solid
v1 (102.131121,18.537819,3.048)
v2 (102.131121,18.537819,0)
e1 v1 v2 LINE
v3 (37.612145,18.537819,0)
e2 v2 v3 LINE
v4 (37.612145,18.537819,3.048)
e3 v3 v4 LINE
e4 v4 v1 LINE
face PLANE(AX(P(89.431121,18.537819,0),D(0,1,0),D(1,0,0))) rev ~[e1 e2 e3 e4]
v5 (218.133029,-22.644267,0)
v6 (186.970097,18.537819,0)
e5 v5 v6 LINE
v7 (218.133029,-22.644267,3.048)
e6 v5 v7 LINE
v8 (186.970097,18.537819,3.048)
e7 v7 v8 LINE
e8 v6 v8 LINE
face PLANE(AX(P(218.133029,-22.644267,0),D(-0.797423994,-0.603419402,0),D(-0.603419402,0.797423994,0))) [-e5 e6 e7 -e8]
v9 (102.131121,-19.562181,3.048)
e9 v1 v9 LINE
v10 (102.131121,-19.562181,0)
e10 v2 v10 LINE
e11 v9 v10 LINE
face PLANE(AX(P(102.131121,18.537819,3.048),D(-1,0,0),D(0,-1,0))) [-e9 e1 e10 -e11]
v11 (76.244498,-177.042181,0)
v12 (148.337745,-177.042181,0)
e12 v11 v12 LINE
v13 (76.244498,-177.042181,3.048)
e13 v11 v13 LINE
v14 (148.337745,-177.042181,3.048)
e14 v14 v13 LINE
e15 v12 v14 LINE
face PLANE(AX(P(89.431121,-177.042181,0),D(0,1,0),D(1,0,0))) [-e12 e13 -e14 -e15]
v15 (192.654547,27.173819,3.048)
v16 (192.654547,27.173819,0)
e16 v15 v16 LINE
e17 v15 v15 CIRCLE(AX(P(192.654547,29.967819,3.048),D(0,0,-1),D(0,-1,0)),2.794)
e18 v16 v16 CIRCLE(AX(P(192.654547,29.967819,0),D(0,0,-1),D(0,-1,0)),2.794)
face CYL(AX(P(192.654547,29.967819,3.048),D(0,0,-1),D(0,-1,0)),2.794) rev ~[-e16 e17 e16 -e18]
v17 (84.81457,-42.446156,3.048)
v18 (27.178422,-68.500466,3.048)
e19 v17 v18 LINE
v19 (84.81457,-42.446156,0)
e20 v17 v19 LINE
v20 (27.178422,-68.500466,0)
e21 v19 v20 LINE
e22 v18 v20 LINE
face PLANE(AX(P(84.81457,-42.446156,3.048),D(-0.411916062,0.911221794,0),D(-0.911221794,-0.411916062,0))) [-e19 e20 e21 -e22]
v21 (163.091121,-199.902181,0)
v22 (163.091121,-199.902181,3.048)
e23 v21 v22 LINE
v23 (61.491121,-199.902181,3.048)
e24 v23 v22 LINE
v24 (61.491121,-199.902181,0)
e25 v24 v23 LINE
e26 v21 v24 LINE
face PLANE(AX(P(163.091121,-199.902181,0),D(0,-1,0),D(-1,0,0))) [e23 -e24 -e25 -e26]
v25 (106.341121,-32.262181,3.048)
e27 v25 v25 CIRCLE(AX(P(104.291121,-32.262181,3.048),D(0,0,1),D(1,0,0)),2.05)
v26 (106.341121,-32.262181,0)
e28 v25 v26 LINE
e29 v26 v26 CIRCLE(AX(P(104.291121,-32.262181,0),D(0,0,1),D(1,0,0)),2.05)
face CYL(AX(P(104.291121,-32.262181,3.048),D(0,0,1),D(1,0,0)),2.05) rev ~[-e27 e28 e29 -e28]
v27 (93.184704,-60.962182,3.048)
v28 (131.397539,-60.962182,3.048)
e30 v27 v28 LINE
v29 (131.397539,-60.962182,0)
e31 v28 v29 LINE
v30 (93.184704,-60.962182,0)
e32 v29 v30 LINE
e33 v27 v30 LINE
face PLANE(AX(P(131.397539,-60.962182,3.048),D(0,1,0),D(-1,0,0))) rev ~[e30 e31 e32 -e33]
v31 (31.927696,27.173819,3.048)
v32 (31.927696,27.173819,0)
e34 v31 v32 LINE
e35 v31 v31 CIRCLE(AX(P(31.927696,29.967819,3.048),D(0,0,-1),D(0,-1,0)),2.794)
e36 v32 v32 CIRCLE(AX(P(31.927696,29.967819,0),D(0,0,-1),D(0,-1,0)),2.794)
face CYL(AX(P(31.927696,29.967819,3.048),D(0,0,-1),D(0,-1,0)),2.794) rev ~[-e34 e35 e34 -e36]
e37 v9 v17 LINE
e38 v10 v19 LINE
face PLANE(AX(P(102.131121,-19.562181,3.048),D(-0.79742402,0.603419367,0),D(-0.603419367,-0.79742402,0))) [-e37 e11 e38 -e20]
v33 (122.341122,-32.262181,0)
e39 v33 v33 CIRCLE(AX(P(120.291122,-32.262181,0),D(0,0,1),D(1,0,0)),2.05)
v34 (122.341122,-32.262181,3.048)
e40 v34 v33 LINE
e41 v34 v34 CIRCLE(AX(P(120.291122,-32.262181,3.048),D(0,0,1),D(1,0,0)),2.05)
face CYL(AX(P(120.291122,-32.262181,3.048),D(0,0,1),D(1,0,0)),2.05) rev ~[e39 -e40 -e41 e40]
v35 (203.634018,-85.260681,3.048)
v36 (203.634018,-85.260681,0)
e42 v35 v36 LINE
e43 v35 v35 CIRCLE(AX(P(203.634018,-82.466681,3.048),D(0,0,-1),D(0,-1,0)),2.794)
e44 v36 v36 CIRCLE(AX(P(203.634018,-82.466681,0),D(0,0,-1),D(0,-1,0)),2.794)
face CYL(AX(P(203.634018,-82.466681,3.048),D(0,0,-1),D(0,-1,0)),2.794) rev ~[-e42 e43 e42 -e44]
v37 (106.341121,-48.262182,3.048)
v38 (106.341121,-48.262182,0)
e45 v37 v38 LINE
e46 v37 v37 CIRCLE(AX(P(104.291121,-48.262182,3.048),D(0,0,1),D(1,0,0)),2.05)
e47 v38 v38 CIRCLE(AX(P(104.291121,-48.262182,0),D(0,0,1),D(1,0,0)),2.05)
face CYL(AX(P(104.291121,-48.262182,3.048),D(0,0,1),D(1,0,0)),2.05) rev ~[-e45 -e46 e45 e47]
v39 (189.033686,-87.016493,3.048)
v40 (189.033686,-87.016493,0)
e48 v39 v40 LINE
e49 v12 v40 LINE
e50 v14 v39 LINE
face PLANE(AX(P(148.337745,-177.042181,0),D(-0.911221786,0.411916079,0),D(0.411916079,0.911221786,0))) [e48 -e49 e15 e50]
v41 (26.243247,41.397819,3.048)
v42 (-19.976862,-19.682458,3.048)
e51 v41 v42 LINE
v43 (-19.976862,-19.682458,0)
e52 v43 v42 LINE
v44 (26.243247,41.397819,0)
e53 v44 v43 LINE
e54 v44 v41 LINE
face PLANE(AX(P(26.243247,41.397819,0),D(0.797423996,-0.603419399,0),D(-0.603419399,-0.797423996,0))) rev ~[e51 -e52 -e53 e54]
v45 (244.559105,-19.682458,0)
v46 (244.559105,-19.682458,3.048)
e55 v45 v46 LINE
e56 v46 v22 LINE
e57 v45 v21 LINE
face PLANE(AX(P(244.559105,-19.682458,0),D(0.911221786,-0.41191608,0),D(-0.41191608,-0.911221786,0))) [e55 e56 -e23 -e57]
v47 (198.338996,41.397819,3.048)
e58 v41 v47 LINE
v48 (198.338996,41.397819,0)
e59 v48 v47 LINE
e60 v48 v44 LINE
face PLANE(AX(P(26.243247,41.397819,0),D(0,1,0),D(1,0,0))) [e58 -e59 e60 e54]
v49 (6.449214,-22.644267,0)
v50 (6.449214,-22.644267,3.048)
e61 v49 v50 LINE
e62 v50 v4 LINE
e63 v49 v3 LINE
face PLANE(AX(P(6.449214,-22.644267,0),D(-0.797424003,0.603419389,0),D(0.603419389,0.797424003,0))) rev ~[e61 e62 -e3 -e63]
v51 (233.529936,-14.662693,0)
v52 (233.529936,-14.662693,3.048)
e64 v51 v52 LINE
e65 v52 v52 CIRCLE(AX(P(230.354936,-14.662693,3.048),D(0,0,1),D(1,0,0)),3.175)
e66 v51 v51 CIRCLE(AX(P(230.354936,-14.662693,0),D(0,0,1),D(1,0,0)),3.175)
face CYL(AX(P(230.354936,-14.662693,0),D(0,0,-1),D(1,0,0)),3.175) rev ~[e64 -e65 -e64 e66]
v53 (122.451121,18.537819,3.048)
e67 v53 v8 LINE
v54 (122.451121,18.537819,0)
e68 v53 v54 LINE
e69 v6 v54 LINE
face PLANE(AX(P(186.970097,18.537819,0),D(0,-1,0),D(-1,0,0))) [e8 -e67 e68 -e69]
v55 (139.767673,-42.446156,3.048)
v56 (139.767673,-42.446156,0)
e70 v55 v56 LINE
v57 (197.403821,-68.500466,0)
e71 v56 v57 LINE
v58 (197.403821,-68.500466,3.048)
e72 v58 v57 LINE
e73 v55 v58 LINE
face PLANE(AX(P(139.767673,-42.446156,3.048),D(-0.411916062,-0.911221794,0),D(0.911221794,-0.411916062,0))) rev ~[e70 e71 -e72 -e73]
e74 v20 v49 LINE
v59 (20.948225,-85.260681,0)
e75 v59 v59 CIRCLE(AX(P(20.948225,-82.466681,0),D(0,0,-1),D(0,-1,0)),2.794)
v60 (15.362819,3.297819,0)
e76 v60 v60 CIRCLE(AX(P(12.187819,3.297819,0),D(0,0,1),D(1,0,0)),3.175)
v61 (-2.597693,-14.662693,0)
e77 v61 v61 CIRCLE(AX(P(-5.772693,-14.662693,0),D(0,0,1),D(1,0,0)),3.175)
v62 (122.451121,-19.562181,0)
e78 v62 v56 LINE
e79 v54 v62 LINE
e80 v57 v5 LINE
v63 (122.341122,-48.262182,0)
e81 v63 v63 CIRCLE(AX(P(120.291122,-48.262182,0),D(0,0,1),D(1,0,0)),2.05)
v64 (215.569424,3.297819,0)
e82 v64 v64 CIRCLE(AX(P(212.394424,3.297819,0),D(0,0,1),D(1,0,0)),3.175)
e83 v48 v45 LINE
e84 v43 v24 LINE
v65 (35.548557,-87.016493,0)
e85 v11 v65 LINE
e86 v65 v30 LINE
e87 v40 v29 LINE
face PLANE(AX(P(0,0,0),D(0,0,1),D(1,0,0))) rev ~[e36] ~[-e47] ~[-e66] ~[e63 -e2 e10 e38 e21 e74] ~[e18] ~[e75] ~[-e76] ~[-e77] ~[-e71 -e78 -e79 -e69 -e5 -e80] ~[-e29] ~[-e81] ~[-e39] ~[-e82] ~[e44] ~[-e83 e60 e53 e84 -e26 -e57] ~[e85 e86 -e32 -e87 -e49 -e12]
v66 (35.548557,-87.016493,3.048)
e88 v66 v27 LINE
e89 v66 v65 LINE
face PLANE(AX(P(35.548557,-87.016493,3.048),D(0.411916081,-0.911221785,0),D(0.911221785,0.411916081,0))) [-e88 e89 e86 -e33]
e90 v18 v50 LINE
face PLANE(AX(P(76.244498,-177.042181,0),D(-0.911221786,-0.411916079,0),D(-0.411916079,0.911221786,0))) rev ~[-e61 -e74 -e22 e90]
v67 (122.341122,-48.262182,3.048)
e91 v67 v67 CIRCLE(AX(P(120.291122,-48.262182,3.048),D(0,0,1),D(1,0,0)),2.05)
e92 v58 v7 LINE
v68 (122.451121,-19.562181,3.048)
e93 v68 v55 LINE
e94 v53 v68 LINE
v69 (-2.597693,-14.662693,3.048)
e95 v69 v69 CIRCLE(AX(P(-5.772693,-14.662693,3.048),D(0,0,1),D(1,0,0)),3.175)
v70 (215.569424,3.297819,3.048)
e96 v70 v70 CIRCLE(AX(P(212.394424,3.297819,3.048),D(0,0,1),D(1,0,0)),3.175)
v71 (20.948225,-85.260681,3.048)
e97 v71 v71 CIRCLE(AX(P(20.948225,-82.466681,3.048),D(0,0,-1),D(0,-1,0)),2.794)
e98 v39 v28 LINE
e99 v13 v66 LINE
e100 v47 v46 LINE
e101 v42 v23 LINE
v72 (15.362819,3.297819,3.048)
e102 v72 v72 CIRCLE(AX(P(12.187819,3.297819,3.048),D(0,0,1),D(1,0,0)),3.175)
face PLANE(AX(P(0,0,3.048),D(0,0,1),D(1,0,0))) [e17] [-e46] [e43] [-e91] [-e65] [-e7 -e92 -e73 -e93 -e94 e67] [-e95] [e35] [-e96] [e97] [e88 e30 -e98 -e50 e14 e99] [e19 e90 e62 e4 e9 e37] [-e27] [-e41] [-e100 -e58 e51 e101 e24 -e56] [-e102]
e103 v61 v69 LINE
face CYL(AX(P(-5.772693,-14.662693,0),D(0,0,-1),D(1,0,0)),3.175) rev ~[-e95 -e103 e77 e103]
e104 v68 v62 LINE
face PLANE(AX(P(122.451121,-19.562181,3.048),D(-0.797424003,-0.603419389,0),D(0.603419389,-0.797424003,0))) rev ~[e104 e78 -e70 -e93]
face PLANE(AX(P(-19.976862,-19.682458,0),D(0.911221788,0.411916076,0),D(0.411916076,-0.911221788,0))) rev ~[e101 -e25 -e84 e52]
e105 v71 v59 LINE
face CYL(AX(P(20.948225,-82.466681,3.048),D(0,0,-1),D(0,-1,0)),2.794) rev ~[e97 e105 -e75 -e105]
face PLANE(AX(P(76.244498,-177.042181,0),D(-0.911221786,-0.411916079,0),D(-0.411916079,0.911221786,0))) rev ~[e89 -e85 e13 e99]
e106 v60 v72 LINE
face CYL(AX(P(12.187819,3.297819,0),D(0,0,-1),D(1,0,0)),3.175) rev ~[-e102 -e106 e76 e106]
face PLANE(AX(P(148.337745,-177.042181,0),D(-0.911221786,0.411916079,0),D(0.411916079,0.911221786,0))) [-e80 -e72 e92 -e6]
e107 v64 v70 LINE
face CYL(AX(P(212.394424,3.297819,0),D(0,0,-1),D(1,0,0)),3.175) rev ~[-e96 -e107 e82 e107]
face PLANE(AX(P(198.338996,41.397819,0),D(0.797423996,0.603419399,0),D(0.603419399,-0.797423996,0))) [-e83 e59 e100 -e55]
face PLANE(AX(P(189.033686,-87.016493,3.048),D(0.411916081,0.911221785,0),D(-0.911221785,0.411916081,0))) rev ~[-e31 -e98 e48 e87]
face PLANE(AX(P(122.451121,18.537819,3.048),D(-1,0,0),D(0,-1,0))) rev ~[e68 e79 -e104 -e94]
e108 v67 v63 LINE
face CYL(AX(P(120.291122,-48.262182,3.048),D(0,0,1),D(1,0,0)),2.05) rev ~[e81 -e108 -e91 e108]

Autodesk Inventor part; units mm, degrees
ref_plane "YZ Plane" through (0, 0, 0) normal (1, 0, 0) x (0, 1, 0)
ref_plane "XZ Plane" through (0, 0, 0) normal (0, 1, 0) x (-1, 0, 0)
ref_plane "XY Plane" through (0, 0, 0) normal (0, 0, 1) x (1, 0, 0)
sketch "Base" plane through (0, 0, 0) normal (0, 0, 1) x (1, 0, 0)
  circle A0 centre (12.187819, 3.297819) radius 3.175
  circle A1 centre (-5.772693, -14.662693) radius 3.175
  circle A2 centre (212.394424, 3.297819) radius 3.175
  circle A3 centre (230.354936, -14.662693) radius 3.175
  arc A4 (-21.168075, -17.047312) -> (9.622688, 23.64295) centre (-130.364106, 97.577494) ccw construction
  arc A5 (214.959555, 23.64295) -> (245.750318, -17.047312) centre (354.946349, 97.577494) ccw construction
  line L0 (26.243247, 41.397819) -> (-19.976862, -19.682458)
  line L1 (12.187819, 3.297819) -> (212.394424, 3.297819) construction
  line L2 (112.291121, 41.397819) -> (112.291121, -199.902181) construction
  line L3 (26.243247, 41.397819) -> (112.291121, 41.397819)
  line L4 (-19.976862, -19.682458) -> (61.491121, -199.902181)
  line L5 (61.491121, -199.902181) -> (112.291121, -199.902181)
  line L6 (9.622688, 23.64295) -> (-21.168075, -17.047312) construction
  line L7 (-19.976862, -19.682458) -> (-21.168075, -17.047312) construction
  line L8 (62.346745, -145.552947) -> (162.235762, -145.552947) construction
  line L9 (89.431121, 18.537819) -> (89.431121, -177.042181) construction
  line L10 (89.431121, -177.042181) -> (76.244498, -177.042181)
  line L11 (76.244498, -177.042181) -> (6.449214, -22.644267)
  line L12 (6.449214, -22.644267) -> (37.612145, 18.537819)
  line L13 (37.612145, 18.537819) -> (89.431121, 18.537819)
  line L14 (89.431121, 18.537819) -> (112.291121, 18.537819)
  line L15 (89.431121, -177.042181) -> (112.291121, -177.042181)
  line L16 (198.338996, 41.397819) -> (244.559105, -19.682458)
  line L17 (198.338996, 41.397819) -> (112.291121, 41.397819)
  line L18 (244.559105, -19.682458) -> (163.091121, -199.902181)
  line L19 (163.091121, -199.902181) -> (112.291121, -199.902181)
  line L20 (135.151121, -177.042181) -> (148.337745, -177.042181)
  line L21 (148.337745, -177.042181) -> (218.133029, -22.644267)
  line L22 (218.133029, -22.644267) -> (186.970097, 18.537819)
  line L23 (186.970097, 18.537819) -> (135.151121, 18.537819)
  line L24 (135.151121, 18.537819) -> (112.291121, 18.537819)
  line L25 (135.151121, -177.042181) -> (112.291121, -177.042181)
  point P0 (0, 0)
  point P1 (112.291121, 3.297819)
extrude "Plate1" add sketch "Base" along normal blind 3.048
sketch "Sketch2" plane through (0, 0, 3.048) normal (0, 0, 1) x (1, 0, 0)
  circle A0 centre (104.291121, -48.262182) radius 2.05
  circle A1 centre (104.291121, -32.262181) radius 2.05
  circle A2 centre (120.291122, -32.262181) radius 2.05
  circle A3 centre (120.291122, -48.262182) radius 2.05
  line L0 (120.291122, -32.262181) -> (104.291121, -32.262181) construction
  line L1 (104.291121, -32.262181) -> (104.291121, -48.262182) construction
  line L2 (104.291121, -48.262182) -> (120.291122, -48.262182) construction
  line L3 (120.291122, -48.262182) -> (120.291122, -32.262181) construction
  line L4 (186.970097, 18.537819) -> (37.612145, 18.537819)
  line L5 (148.337745, -177.042181) -> (76.244498, -177.042181)
  line L6 (112.291121, 18.537819) -> (112.291121, -177.042181) construction
  line L7 (76.244498, -177.042181) -> (148.337745, -177.042181)
  line L8 (122.451121, 18.537819) -> (122.451121, -19.562181)
  line L9 (122.451121, -19.562181) -> (139.767673, -42.446156)
  line L10 (139.767673, -42.446156) -> (197.403821, -68.500466)
  line L11 (218.133029, -22.644267) -> (148.337745, -177.042181)
  line L12 (189.033686, -87.016493) -> (131.397539, -60.962182)
  line L13 (131.397539, -60.962182) -> (112.291121, -60.962182)
  line L14 (218.133029, -22.644267) -> (186.970097, 18.537819)
  line L15 (148.337745, -177.042181) -> (218.133029, -22.644267)
  line L16 (122.451121, -19.562181) -> (112.291121, -19.562181) construction
  line L17 (139.767673, -42.446156) -> (131.397539, -60.962182) construction
  line L18 (102.131121, 18.537819) -> (102.131121, -19.562181)
  line L19 (102.131121, -19.562181) -> (84.81457, -42.446156)
  line L20 (84.81457, -42.446156) -> (27.178422, -68.500466)
  line L21 (35.548557, -87.016493) -> (93.184704, -60.962182)
  line L22 (93.184704, -60.962182) -> (112.291121, -60.962182)
  line L23 (122.451121, 18.537819) -> (102.131121, 18.537819)
  line L24 (197.403821, -68.500466) -> (189.033686, -87.016493)
  line L25 (27.178422, -68.500466) -> (35.548557, -87.016493)
  line L26 (76.244498, -177.042181) -> (6.449214, -22.644267)
  point P0 (0, 0)
  point P1 (112.291121, -32.262181)
  dimension "d8" = 16
  dimension "d9" = 16
  dimension "d10" = 50.8
  dimension "d11" = 10.16
  dimension "d12" = 20.32
  dimension "d13" = 12.7
  dimension "d14" = 12.7
sheet face with bend "Face2" sketch "Sketch2" thickness 3.048 toward (0, 0, -1) bend radius 3.048 contours L8 L9 L10 L11 L12 L13 L22 L21 L25 L20 L19 L18 L4
bend "Bend1"
sketch "Sketch3" plane through (0, 0, 3.048) normal (0, 0, 1) x (1, 0, 0)
  circle A0 centre (31.927696, 29.967819) radius 2.794
  line L0 (26.243247, 41.397819) -> (-19.976862, -19.682458)
  line L1 (6.449214, -22.644267) -> (37.612145, 18.537819)
  line L2 (26.243247, 41.397819) -> (37.612145, 18.537819) construction
  line L3 (186.970097, 18.537819) -> (218.133029, -22.644267)
  line L4 (244.559105, -19.682458) -> (198.338996, 41.397819)
  line L5 (186.970097, 18.537819) -> (198.338996, 41.397819) construction
  circle A1 centre (192.654547, 29.967819) radius 2.794
  line L6 (27.178422, -68.500466) -> (6.449214, -22.644267)
  line L7 (27.178422, -68.500466) -> (35.548557, -87.016493) construction
  line L8 (31.36349, -77.75848) -> (10.53296, -87.174881) construction
  line L9 (61.491121, -199.902181) -> (-19.976862, -19.682458)
  circle A2 centre (20.948225, -82.466681) radius 2.794
  line L10 (26.243247, 41.397819) -> (198.338996, 41.397819)
  line L11 (112.291121, 41.397819) -> (112.291121, -60.962182) construction
  line L12 (93.184704, -60.962182) -> (131.397539, -60.962182)
  circle A3 centre (203.634018, -82.466681) radius 2.794
  point P0 (0, 0)
  dimension "d20" = 5.588
  dimension "d21" = 5.588
hole "Hole1" at (31.927696, 29.967819, 3.048) at (192.654547, 29.967819, 3.048) at (20.948225, -82.466681, 3.048) at (203.634018, -82.466681, 3.048) direction (0, 0, -1) diameter 5.588 end through all
equation "\"d12\" = 2 * d11"
equation "\"d27\" = Thickness"
equation "\"d7\" = Thickness"
equation "\"d15\" = BendRadius"
equation "\"d16\" = BendReliefWidth"
equation "\"d18\" = MinimumRemnant"
equation "\"d17\" = BendReliefDepth"
equation "\"d19\" = TransitionRadius"
equation "\"BendRadius\" = Thickness"
equation "\"BendReliefWidth\" = Thickness"
equation "\"BendReliefDepth\" = 0.5 * Thickness"
equation "\"CornerReliefSize\" = 4 * Thickness"
equation "\"MinimumRemnant\" = 2 * Thickness"
equation "\"TransitionRadius\" = BendRadius"
equation "\"JacobiRadiusSize\" = BendRadius"
equation "\"GapSize\" = Thickness"
equation "\"Thickness\" = 3.048"
properties part number "ChestMount"
